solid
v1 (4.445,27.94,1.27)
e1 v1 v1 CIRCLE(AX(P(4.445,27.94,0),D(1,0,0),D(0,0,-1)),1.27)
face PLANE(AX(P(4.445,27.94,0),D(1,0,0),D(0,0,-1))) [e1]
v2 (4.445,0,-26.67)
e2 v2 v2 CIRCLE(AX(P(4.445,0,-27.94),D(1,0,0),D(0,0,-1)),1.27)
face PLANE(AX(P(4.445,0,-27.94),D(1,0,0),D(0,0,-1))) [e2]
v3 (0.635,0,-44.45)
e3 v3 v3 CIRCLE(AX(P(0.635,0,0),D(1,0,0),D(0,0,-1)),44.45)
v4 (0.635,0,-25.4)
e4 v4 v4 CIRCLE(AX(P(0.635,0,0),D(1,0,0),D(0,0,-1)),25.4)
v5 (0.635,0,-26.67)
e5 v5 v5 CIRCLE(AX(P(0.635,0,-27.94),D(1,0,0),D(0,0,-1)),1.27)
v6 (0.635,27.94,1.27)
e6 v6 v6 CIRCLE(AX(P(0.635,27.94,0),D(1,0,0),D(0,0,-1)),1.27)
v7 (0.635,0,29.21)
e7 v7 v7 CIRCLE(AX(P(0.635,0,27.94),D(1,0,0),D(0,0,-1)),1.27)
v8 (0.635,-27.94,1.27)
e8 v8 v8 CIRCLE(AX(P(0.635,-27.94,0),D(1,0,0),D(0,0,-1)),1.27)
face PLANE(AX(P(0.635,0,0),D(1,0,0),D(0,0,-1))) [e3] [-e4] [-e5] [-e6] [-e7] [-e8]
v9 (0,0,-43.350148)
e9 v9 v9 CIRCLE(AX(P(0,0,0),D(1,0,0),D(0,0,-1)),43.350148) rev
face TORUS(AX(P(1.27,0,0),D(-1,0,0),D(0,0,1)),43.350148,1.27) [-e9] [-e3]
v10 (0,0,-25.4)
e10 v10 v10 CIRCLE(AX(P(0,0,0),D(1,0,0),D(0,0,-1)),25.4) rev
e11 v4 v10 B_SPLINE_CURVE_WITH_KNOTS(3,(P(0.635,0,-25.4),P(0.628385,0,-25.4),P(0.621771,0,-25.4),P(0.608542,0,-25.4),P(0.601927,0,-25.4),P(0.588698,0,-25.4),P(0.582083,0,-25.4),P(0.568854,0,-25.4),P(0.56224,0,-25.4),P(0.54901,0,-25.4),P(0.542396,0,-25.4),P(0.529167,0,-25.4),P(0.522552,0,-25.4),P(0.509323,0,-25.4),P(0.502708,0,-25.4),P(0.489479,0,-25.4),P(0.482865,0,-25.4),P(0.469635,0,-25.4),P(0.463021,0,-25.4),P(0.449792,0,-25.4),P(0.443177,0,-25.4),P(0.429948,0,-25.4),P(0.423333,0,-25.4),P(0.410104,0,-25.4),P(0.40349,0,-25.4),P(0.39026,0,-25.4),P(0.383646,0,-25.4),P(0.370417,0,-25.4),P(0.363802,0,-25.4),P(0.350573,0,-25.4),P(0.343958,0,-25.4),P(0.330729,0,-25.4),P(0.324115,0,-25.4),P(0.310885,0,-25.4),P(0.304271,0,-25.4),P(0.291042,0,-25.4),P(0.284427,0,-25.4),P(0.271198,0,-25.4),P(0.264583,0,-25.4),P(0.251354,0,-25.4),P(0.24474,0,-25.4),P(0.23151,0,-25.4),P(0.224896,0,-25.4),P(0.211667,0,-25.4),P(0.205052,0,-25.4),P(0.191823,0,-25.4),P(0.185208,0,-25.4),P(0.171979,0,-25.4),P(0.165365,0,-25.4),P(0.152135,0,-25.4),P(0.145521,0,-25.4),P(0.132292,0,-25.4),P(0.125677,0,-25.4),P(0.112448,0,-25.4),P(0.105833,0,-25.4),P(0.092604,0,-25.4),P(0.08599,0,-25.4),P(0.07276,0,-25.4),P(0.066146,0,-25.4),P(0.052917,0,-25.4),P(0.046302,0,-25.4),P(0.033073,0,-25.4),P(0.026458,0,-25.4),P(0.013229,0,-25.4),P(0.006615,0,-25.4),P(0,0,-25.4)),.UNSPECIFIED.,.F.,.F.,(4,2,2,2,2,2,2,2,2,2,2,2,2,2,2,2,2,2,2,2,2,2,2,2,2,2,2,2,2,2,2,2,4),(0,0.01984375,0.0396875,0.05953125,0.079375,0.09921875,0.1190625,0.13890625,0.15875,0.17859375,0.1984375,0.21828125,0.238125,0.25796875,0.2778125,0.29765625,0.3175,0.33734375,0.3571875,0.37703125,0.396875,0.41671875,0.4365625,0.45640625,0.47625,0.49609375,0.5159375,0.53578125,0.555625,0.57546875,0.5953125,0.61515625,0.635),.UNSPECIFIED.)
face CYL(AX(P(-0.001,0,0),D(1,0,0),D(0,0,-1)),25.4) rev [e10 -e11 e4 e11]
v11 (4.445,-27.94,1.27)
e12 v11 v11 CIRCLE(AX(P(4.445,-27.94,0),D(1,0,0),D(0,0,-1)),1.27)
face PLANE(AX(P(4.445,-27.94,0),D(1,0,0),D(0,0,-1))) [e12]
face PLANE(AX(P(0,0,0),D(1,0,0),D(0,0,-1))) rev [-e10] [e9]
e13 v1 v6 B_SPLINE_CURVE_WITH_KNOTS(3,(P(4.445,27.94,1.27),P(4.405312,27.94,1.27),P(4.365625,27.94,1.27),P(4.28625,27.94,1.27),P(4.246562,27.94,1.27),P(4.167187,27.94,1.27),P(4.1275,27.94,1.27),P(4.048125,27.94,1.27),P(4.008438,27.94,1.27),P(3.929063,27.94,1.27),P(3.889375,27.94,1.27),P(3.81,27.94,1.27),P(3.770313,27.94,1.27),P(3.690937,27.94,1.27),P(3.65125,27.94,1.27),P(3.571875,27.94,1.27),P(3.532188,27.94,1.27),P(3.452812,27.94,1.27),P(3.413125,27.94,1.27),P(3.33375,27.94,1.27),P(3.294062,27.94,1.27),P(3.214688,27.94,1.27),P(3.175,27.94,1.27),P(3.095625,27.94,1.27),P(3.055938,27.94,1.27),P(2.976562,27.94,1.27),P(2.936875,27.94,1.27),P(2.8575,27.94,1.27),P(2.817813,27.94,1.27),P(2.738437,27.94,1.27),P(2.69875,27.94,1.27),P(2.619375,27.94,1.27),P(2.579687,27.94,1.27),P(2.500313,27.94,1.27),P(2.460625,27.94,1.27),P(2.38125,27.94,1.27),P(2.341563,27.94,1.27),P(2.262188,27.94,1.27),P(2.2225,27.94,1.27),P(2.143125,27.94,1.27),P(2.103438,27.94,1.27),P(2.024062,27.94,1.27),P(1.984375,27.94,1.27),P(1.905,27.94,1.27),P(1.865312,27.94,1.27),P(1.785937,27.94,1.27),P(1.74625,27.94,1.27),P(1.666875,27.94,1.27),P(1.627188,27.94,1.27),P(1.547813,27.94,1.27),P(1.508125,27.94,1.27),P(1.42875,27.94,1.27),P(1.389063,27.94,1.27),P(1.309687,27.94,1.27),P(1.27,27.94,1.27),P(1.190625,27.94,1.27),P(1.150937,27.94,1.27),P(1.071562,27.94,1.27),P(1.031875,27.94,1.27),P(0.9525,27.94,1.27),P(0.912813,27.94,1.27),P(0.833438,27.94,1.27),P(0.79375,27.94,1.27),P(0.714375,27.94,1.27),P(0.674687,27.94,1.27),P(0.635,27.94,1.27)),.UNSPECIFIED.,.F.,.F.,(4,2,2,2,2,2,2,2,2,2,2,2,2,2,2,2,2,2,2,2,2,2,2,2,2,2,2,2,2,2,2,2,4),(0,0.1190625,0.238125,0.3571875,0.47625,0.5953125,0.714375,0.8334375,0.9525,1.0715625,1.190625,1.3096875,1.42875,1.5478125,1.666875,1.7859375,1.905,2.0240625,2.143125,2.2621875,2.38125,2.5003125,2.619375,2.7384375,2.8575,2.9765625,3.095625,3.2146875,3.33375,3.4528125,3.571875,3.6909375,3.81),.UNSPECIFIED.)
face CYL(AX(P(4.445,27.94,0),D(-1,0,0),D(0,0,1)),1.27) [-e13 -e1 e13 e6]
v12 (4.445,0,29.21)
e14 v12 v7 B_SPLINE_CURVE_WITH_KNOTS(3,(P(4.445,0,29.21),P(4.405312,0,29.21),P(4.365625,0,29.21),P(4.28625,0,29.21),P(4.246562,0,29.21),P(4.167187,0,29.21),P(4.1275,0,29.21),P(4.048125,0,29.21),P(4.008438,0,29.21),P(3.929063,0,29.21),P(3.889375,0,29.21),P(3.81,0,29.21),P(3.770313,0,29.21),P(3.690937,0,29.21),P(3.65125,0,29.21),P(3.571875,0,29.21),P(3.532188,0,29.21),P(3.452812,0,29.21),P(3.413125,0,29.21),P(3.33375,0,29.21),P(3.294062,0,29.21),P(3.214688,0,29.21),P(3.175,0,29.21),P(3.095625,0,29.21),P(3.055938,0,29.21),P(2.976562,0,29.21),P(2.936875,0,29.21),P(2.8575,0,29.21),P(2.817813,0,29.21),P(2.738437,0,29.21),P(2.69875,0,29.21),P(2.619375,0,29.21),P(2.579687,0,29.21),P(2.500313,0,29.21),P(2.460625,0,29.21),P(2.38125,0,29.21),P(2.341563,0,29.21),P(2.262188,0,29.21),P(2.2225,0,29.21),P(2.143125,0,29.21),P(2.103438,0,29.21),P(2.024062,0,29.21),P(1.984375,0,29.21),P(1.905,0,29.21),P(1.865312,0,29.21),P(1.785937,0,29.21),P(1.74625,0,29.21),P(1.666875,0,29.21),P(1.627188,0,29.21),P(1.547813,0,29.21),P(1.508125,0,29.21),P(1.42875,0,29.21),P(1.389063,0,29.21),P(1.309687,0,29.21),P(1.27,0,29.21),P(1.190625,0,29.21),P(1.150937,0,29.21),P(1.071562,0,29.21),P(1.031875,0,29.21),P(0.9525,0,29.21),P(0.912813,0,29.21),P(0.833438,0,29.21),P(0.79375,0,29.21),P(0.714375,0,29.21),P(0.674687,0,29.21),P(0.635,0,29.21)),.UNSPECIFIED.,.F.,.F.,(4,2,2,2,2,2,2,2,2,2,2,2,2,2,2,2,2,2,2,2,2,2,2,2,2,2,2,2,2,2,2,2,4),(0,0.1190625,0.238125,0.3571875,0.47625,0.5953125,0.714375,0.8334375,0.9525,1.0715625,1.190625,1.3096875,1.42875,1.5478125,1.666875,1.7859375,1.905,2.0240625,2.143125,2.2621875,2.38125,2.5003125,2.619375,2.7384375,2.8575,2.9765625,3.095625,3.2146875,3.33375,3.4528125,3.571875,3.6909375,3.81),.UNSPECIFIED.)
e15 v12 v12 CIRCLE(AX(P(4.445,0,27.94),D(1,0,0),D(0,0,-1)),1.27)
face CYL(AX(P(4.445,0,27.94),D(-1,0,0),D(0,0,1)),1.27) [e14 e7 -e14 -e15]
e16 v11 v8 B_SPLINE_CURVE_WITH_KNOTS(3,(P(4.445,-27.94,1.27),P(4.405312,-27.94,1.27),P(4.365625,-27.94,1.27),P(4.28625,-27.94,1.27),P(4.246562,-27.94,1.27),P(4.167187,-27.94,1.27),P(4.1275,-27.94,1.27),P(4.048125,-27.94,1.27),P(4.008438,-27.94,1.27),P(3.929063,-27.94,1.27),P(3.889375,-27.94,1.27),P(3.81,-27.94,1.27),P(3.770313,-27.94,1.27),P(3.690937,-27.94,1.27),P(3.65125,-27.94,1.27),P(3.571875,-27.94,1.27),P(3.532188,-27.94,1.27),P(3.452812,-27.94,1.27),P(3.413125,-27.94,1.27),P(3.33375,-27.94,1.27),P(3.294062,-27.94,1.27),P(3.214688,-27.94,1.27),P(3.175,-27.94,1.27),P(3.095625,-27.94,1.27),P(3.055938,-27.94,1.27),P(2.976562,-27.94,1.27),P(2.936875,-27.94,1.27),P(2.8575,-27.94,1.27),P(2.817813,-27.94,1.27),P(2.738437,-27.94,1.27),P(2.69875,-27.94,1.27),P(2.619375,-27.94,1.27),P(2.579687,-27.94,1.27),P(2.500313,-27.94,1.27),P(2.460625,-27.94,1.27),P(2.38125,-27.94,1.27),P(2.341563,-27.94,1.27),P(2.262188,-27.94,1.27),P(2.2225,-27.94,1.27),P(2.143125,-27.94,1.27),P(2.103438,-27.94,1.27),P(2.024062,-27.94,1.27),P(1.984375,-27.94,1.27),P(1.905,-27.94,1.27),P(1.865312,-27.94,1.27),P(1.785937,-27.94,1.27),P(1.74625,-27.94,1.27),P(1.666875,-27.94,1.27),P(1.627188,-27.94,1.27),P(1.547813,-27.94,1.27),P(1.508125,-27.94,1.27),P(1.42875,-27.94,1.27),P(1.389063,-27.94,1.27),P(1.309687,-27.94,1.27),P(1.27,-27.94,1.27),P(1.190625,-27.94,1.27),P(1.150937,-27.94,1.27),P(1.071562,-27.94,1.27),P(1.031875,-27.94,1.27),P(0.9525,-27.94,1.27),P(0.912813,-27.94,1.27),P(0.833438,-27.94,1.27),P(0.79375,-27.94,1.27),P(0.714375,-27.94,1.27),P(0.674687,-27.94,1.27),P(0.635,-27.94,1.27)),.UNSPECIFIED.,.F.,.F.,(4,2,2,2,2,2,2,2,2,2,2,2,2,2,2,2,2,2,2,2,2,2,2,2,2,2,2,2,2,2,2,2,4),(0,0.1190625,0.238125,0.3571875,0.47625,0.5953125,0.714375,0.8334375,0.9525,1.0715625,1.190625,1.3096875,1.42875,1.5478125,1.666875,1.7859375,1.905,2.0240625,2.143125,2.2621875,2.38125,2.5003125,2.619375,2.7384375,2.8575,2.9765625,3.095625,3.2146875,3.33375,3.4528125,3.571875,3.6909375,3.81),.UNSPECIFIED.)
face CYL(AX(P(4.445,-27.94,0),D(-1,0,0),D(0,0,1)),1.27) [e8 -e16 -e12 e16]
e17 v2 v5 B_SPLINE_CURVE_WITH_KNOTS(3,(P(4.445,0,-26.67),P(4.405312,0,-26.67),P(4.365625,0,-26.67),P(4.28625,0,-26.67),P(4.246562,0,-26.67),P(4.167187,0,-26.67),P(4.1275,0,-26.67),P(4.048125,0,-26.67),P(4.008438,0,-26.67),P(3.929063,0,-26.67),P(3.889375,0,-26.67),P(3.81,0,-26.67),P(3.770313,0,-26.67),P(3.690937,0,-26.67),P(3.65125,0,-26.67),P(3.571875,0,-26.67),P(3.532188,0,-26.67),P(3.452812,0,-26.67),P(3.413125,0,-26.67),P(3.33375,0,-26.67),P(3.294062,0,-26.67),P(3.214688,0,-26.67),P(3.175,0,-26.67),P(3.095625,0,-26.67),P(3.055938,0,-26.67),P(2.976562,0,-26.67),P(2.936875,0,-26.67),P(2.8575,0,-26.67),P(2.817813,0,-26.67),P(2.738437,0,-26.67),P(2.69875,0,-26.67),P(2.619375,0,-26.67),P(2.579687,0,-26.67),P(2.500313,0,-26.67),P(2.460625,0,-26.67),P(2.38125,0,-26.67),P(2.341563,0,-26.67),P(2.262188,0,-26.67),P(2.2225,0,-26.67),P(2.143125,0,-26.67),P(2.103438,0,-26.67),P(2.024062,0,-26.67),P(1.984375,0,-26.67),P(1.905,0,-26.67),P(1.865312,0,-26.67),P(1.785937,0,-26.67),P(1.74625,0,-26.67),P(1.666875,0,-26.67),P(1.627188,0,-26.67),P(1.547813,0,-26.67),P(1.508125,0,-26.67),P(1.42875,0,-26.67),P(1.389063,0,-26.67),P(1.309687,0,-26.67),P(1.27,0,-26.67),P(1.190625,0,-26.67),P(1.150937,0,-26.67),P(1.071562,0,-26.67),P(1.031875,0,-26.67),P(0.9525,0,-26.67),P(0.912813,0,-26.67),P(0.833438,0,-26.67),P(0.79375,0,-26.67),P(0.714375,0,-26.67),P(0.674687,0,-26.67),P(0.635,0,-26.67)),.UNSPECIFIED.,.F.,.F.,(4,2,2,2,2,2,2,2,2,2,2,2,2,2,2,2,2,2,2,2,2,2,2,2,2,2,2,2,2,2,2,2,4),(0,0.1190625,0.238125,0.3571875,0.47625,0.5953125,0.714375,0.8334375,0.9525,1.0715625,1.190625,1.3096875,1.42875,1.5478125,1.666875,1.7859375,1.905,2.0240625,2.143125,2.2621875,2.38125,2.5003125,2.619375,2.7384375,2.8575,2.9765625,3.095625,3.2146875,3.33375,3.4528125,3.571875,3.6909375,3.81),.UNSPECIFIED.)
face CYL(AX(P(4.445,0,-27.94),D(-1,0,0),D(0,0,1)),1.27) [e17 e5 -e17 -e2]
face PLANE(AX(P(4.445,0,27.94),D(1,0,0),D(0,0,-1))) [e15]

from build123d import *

# Parameters (mm, degrees)
SKETCH1_R           = 44.45
BOSS_EXTRUDE1_DEPTH = 0.635
SKETCH2_R           = 1.27
BOSS_EXTRUDE2_DEPTH = 3.81
CUT_EXTRUDE1_REACH  = 64.977
SKETCH3_R           = 25.4
FILLET1_R           = 1.27


with BuildPart() as part:
    # Sketch1 → Boss-Extrude1 (new body)
    with BuildSketch(Plane(origin=(0, 0, 0), x_dir=(0, 0, -1), z_dir=(1, 0, 0))):
        Circle(SKETCH1_R)
    extrude(amount=BOSS_EXTRUDE1_DEPTH)

    # Sketch2 → Boss-Extrude2 (add)
    with BuildSketch(Plane(origin=(0.635, 0, 0), x_dir=(0, 0, -1), z_dir=(1, 0, 0))):
        with Locations(Location((0, 27.94, 0), (0, 0, 180))):
            Circle(SKETCH2_R)
        with Locations(Location((27.94, 0, 0), (0, 0, 180))):
            Circle(SKETCH2_R)
        with Locations(Location((0, -27.94, 0), (0, 0, 180))):
            Circle(SKETCH2_R)
        with Locations(Location((-27.94, 0, 0), (0, 0, 180))):
            Circle(SKETCH2_R)
    extrude(amount=BOSS_EXTRUDE2_DEPTH)

    # Sketch3 → Cut-Extrude1 (cut, up to next)
    with BuildSketch(Plane(origin=(0.635, 0, 0), x_dir=(0, 0, -1), z_dir=(1, 0, 0)), mode=Mode.PRIVATE) as cut_extrude1_sk1:
        Circle(SKETCH3_R)
    cut_extrude1_tool1 = extrude(cut_extrude1_sk1.sketch, amount=-CUT_EXTRUDE1_REACH, mode=Mode.PRIVATE) & part.part
    add(cut_extrude1_tool1.solids().sort_by_distance((0.635, 0, 0))[0], mode=Mode.SUBTRACT)

    # Fillet1
    # the kernel refuses this fillet: 1.27 mm, written as the material it takes off along each edge
    with BuildSketch(Plane(origin=(0, 0, 0), x_dir=(0, 0, -1), z_dir=(0, -1, 0))) as fillet1_piece_1:
        with BuildLine():
            CenterArc((43.350147737, 1.27), FILLET1_R, 270, 60)
            Line((43.350147737, 0), (43.350147737, -0.0254))
            Line((43.350147737, -0.0254), (44.45, -0.0254))
            Line((44.45, -0.0254), (44.4754, 0))
            ThreePointArc((44.4754, 0), (44.4754, 0.3175), (44.471997045, 0.6223))
            Line((44.471997045, 0.6223), (44.45, 0.635))
        make_face()
    revolve(axis=Axis((0, 0, 0), (1, 0, 0)), mode=Mode.SUBTRACT)


solid = part.part
